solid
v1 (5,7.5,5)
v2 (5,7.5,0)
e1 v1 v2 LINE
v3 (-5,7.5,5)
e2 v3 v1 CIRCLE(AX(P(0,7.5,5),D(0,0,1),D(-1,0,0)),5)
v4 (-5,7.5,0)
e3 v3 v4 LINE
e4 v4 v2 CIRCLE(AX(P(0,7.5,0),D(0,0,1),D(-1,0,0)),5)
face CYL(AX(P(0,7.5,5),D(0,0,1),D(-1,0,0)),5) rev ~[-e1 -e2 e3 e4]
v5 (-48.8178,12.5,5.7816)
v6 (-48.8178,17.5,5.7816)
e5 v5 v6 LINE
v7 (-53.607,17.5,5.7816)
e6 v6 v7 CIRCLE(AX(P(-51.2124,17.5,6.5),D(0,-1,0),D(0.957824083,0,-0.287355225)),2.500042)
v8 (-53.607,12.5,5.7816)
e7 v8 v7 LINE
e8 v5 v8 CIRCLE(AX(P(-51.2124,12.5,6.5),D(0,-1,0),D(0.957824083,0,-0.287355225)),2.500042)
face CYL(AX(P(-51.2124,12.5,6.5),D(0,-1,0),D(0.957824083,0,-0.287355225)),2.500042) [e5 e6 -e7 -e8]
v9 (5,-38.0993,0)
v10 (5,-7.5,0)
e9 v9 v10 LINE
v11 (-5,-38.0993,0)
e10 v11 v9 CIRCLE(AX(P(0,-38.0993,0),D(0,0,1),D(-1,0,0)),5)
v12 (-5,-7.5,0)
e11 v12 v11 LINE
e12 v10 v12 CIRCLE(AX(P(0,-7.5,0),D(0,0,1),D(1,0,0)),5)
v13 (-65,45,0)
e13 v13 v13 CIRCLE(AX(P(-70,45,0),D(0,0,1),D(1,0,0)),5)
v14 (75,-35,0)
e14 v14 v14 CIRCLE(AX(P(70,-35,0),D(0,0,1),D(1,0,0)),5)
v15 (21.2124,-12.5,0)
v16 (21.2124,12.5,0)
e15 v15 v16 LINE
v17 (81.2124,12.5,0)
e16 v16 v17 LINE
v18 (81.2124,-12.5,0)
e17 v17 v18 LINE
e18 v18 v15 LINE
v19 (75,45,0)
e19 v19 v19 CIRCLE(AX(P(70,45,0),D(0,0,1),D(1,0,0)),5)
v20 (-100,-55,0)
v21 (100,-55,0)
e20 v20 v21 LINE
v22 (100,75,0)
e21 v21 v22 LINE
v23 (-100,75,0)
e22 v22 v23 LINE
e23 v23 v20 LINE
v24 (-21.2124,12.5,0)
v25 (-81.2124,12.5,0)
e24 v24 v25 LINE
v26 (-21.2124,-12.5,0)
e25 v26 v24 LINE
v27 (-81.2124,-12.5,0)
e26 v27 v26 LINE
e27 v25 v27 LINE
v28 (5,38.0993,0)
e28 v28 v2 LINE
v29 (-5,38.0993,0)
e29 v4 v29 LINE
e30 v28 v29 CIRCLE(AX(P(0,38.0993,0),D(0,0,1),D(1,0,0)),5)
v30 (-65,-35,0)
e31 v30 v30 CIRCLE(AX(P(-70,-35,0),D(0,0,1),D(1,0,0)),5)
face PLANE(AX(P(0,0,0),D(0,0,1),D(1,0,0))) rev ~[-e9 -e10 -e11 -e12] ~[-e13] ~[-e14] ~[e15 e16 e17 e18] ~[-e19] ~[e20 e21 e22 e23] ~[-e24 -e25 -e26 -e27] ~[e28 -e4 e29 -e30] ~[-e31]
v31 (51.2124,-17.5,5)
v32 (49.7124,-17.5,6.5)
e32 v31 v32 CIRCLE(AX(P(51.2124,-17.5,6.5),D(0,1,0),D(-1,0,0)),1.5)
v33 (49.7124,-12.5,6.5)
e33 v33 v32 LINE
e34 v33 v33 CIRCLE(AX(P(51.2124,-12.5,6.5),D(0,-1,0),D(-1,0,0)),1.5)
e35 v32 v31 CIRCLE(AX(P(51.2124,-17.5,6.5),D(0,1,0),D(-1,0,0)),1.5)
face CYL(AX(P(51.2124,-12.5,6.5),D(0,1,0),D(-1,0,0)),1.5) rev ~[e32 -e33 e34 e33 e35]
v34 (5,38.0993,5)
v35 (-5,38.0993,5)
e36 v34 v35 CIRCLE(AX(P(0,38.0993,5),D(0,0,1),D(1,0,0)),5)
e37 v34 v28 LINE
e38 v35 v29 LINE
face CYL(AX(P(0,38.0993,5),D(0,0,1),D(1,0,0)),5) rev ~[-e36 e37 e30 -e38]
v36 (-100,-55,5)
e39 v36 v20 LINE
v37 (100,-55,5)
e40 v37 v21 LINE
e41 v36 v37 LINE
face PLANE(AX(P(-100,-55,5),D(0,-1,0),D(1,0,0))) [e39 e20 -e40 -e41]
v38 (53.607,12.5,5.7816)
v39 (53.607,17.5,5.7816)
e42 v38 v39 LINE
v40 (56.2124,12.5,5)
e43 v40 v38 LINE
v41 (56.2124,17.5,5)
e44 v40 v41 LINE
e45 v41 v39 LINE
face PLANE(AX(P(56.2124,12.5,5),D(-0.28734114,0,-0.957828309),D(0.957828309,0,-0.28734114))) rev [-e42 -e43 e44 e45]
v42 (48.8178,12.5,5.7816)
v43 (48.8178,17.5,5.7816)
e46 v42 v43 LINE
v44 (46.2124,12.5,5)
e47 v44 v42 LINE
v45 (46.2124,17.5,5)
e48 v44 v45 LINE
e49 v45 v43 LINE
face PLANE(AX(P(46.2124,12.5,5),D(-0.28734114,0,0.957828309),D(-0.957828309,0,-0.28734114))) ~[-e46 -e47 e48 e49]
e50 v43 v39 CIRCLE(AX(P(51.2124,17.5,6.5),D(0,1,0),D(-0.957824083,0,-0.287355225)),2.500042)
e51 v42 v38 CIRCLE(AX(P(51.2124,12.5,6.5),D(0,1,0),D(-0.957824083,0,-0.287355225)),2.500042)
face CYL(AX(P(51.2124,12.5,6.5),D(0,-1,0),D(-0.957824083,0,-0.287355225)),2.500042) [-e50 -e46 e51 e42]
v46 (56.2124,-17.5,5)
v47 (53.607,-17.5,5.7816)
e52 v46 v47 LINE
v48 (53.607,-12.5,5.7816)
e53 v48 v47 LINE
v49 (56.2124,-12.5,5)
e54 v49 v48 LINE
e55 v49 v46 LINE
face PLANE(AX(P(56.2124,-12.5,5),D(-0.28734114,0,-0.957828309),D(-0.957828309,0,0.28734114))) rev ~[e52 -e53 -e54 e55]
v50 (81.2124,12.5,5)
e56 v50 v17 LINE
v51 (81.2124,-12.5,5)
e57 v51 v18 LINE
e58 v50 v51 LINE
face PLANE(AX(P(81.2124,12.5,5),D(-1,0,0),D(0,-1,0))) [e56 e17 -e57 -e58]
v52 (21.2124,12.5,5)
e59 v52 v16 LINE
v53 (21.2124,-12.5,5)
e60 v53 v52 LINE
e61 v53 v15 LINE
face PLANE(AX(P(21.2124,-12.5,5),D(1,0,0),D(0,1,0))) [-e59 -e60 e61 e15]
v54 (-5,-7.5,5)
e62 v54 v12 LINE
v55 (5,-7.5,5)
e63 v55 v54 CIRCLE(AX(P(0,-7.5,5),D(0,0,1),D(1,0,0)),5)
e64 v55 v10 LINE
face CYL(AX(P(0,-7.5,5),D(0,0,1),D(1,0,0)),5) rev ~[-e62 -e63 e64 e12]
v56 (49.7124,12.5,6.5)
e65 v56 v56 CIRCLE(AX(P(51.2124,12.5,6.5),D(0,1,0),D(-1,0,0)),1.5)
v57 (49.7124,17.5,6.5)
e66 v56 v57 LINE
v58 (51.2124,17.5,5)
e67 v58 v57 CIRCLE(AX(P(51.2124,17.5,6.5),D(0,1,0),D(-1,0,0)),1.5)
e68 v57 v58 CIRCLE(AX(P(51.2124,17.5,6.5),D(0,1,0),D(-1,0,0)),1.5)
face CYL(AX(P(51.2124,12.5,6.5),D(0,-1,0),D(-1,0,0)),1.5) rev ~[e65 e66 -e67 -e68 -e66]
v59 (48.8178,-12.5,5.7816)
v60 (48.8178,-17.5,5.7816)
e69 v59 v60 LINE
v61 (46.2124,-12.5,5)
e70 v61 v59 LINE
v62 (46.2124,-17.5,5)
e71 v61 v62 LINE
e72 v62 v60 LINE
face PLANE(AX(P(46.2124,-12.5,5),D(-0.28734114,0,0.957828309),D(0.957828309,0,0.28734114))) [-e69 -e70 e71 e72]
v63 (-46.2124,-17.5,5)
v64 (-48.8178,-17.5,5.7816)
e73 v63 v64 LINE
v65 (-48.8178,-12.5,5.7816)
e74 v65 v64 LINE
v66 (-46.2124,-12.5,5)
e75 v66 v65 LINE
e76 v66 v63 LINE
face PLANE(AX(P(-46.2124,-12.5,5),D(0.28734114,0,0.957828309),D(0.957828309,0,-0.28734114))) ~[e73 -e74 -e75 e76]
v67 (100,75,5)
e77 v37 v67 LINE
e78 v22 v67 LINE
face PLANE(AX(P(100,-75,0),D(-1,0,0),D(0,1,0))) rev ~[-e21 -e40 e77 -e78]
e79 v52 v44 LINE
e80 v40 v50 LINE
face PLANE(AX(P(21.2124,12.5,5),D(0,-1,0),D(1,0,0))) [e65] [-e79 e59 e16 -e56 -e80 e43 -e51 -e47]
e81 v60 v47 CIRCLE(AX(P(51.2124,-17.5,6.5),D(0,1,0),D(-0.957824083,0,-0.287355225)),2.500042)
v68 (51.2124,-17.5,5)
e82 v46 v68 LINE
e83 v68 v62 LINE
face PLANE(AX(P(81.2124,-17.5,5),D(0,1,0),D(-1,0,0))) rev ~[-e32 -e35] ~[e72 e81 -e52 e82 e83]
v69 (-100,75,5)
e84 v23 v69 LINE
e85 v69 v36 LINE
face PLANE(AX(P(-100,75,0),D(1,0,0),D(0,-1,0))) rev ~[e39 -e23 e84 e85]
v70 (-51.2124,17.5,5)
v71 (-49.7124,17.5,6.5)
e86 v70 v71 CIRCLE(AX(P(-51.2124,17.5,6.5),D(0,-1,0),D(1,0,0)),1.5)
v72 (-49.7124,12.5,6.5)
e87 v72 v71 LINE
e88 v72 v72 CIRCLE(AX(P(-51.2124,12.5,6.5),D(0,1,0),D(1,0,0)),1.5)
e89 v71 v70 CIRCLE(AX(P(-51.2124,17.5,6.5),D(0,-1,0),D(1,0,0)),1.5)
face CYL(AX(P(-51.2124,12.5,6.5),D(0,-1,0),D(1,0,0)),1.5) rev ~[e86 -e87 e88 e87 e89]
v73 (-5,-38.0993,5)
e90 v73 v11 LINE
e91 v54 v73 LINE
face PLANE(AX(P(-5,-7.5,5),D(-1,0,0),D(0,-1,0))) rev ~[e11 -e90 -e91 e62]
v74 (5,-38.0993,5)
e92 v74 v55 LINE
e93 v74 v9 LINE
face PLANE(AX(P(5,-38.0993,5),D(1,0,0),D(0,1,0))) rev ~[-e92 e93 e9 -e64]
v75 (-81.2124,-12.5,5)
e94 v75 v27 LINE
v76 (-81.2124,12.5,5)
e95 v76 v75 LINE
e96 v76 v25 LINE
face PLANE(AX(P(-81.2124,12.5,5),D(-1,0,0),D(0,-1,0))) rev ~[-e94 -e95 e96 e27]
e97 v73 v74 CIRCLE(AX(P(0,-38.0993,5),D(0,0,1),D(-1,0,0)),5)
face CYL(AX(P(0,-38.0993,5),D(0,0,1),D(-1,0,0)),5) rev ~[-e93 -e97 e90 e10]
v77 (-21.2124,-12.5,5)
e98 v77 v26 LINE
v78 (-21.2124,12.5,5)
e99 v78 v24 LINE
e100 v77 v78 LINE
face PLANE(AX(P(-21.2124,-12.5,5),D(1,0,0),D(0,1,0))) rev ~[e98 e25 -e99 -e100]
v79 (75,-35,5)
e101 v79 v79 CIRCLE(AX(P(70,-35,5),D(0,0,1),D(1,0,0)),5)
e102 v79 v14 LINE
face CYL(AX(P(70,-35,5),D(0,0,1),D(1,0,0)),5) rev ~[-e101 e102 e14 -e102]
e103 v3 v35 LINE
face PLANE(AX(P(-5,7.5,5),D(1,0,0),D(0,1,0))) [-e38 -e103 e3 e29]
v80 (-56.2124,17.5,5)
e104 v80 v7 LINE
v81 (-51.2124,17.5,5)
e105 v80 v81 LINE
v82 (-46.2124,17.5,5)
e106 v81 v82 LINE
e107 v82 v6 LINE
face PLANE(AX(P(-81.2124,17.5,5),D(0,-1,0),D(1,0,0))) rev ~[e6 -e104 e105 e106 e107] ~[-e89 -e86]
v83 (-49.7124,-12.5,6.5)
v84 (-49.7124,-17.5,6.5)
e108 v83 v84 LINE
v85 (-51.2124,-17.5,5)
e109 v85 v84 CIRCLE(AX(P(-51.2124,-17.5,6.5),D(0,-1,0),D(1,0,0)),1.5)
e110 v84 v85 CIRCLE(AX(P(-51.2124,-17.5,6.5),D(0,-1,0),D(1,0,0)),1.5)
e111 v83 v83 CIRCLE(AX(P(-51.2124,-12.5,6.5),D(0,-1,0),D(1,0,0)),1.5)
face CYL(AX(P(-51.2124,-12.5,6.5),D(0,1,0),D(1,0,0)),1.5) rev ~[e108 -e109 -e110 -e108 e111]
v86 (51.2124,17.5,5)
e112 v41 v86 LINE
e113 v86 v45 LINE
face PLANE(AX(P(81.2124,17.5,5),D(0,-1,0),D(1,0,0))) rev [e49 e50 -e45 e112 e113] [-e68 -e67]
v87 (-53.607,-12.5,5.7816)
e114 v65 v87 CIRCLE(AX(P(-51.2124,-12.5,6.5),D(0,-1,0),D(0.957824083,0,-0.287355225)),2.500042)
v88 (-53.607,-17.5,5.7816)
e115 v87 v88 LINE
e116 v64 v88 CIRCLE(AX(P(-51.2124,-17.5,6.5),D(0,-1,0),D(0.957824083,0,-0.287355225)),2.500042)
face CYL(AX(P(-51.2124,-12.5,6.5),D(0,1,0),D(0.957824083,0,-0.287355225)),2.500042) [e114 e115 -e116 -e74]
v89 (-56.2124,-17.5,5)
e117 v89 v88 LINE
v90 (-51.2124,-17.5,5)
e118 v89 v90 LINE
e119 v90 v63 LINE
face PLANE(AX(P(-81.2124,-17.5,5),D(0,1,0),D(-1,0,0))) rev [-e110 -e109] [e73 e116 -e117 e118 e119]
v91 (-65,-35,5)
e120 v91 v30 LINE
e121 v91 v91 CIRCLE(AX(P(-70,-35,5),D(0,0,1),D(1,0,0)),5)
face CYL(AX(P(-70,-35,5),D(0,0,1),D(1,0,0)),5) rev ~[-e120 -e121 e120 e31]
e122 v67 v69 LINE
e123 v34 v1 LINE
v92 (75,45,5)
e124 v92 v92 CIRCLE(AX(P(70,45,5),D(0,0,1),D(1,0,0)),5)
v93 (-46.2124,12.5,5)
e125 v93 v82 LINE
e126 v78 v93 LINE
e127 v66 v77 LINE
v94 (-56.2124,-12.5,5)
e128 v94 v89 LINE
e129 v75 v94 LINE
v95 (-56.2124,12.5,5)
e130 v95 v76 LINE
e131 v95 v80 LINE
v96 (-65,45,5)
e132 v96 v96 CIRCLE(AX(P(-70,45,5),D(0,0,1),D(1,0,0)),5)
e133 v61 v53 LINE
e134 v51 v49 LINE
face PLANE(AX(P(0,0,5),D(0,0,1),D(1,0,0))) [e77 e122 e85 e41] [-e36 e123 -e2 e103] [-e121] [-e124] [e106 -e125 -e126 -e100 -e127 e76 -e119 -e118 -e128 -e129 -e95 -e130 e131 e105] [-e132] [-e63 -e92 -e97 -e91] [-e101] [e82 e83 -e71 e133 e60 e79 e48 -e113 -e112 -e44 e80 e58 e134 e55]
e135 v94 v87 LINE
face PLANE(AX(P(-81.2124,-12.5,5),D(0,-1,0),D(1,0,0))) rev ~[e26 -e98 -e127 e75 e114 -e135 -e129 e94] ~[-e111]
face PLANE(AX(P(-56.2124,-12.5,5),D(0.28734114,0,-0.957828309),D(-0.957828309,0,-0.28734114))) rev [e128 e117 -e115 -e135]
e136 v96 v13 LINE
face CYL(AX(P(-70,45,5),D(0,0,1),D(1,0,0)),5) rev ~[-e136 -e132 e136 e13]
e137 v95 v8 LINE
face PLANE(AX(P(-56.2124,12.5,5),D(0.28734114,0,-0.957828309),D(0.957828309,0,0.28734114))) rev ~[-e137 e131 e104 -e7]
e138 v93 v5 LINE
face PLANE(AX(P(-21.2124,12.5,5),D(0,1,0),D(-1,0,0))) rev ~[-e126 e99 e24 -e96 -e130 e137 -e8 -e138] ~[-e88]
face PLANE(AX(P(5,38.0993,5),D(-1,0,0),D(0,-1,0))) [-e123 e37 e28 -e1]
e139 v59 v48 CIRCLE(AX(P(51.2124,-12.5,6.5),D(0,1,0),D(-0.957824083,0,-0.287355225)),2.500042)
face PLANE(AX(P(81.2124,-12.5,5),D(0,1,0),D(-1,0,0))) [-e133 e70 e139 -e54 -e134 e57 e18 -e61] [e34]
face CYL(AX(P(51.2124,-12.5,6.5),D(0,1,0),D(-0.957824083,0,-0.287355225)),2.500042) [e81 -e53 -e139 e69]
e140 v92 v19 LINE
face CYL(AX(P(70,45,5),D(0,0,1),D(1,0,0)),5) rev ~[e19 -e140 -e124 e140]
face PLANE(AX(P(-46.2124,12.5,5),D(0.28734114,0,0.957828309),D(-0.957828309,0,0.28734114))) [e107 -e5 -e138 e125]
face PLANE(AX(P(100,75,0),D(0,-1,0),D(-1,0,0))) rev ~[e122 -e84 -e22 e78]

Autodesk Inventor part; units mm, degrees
ref_plane "YZ Plane" through (0, 0, 0) normal (1, 0, 0) x (0, 1, 0)
ref_plane "XZ Plane" through (0, 0, 0) normal (0, 1, 0) x (-1, 0, 0)
sketch "Эскиз1" plane through (0, 0, 0) normal (0, 0, 1) x (1, 0, 0)
  line L0 (-100, -75) -> (100, -75)
  line L1 (100, -75) -> (100, 75)
  line L2 (100, 75) -> (-100, 75)
  line L3 (-100, 75) -> (-100, -75)
  line L4 (-100, -75) -> (100, 75) construction
  line L5 (100, -75) -> (-100, 75) construction
  point P0 (0, 0)
  dimension "d0" = 200
  dimension "d1" = 150
extrude "Выдавливание1" add sketch "Эскиз1" along normal blind 5
sketch "Эскиз2" plane through (0, 0, 5) normal (0, 0, 1) x (1, 0, 0)
  line L0 (-100, -75) -> (100, -75) projected
  line L1 (100, -75) -> (100, 75) projected
  line L2 (100, 75) -> (-100, 75) projected
  line L3 (-100, 75) -> (-100, -75) projected
  line L4 (100, 75) -> (-100, 75) construction
  line L5 (0, 75) -> (0, -75) construction
  line L6 (-100, 0) -> (100, 0) construction
  line L7 (100, -75) -> (100, 75) construction
  line L8 (-100, -12.5) -> (100, -12.5) construction
  line L9 (100, -12.5) -> (100, 12.5) construction
  line L10 (100, 12.5) -> (-100, 12.5) construction
  line L11 (-100, 12.5) -> (-100, -12.5) construction
  line L12 (-100, -12.5) -> (100, 12.5) construction
  line L13 (100, -12.5) -> (-100, 12.5) construction
  line L14 (-100, 0) -> (0, 0) construction
  line L15 (-51.2124, 75) -> (-51.2124, -75) construction
  line L16 (-100, -75) -> (100, -75) construction
  line L17 (0, 0) -> (100, 0) construction
  line L18 (50, 75) -> (50, -75) construction
  line L19 (-81.2124, -12.5) -> (-21.2124, -12.5)
  line L20 (-21.2124, -12.5) -> (-21.2124, 12.5)
  line L21 (-21.2124, 12.5) -> (-81.2124, 12.5)
  line L22 (-81.2124, 12.5) -> (-81.2124, -12.5)
  line L23 (-81.2124, -12.5) -> (-21.2124, 12.5) construction
  line L24 (-21.2124, -12.5) -> (-81.2124, 12.5) construction
  line L25 (81.2124, -12.5) -> (21.2124, -12.5)
  line L26 (21.2124, -12.5) -> (21.2124, 12.5)
  line L27 (21.2124, 12.5) -> (81.2124, 12.5)
  line L28 (81.2124, 12.5) -> (81.2124, -12.5)
  point P0 (-51.2124, 0)
  dimension "d4" = 25
  dimension "d5" = 60
extrude "Выдавливание2" cut sketch "Эскиз2" against normal blind 5 contours L22 L21 L20 L19 | L25 L26 L27 L28
sketch "Эскиз3" plane through (-81.2124, 12.5, 5) normal (0, -1, 0) x (1, 0, 0)
  line L0 (0, 0) -> (60, 0) projected
  line L1 (30, 0) -> (30, 14.9537) construction
  line L2 (30, 0) -> (40, 0) construction
  line L3 (30, 0) -> (35, 0) construction
  line L4 (30, 0) -> (25, 0) construction
  line L5 (25, 0) -> (35, 0) construction
  line L6 (25, 0) -> (35, 0)
  line L7 (30, 0) -> (30, 3) construction
  circle A0 centre (30, 1.5) radius 1.5
  arc A1 (32.3946, 0.7816) -> (27.6054, 0.7816) centre (30, 1.5) ccw
  line L8 (35, 0) -> (32.3946, 0.7816)
  line L9 (25, 0) -> (27.6054, 0.7816)
  point P0 (81.2124, -5)
  dimension "d8" = 10
  dimension "d9" = 5
  dimension "d10" = 5
  dimension "d11" = 3
  dimension "d12" = 1
extrude "Выдавливание3" add sketch "Эскиз3" against normal blind 5
mirror "Зеркальное отражение1" about plane through (0, 0, 0) normal (0, 1, 0) of "Выдавливание3"
sketch "Эскиз4" plane through (-81.2124, 12.5, 0) normal (0, -1, 0) x (1, 0, 0)
  circle A0 centre (30, 6.5) radius 1.5 projected
  point P0 (81.2124, 0)
surface extrude "ВыдавПврх1" sketch "Эскиз4" along normal up to next shown yes curves A0
boundary_patch "Участок поверхности1"
boundary_patch "Участок поверхности2"
ref_plane "РабПлоскость1" through (-81.2124, 0, 0) normal (0, -1, 0) x (1, 0, 0)
sketch "Эскиз6" plane through (0, 0, 5) normal (0, 0, 1) x (1, 0, 0)
  line L0 (81.2124, -12.5) -> (21.2124, -12.5) projected
  line L1 (21.2124, -12.5) -> (21.2124, 12.5) projected
  line L2 (21.2124, 12.5) -> (81.2124, 12.5) projected
  line L3 (81.2124, 12.5) -> (81.2124, -12.5) projected
  line L4 (-100, -75) -> (100, -75) projected
  line L5 (100, -75) -> (100, 75) projected
  line L6 (100, 75) -> (-100, 75) projected
  line L7 (-100, 75) -> (-100, -75) projected
  line L8 (-46.2124, -12.5) -> (-46.2124, -17.5) projected
  line L9 (-46.2124, -17.5) -> (-51.2124, -17.5) projected
  line L10 (-51.2124, -17.5) -> (-56.2124, -17.5) projected
  line L11 (-56.2124, -17.5) -> (-56.2124, -12.5) projected
  line L12 (-56.2124, -12.5) -> (-81.2124, -12.5) projected
  line L13 (-81.2124, -12.5) -> (-81.2124, 12.5) projected
  line L14 (-81.2124, 12.5) -> (-56.2124, 12.5) projected
  line L15 (-56.2124, 12.5) -> (-56.2124, 17.5) projected
  line L16 (-56.2124, 17.5) -> (-51.2124, 17.5) projected
  line L17 (-51.2124, 17.5) -> (-46.2124, 17.5) projected
  line L18 (-46.2124, 17.5) -> (-46.2124, 12.5) projected
  line L19 (-46.2124, 12.5) -> (-21.2124, 12.5) projected
  line L20 (-21.2124, 12.5) -> (-21.2124, -12.5) projected
  line L21 (-21.2124, -12.5) -> (-46.2124, -12.5) projected
  line L22 (-100, -75) -> (100, -75) construction
  line L23 (-21.2124, -75) -> (-21.2124, 75) construction
  line L24 (100, 75) -> (-100, 75) construction
  line L25 (-21.2124, 12.5) -> (-21.2124, 75) construction
  line L26 (-21.2124, 75) -> (21.2124, 75) construction
  line L27 (21.2124, 75) -> (21.2124, 12.5) construction
  line L28 (21.2124, 12.5) -> (-21.2124, 12.5) construction
  line L29 (-21.2124, 12.5) -> (-21.2124, 75) construction
  line L30 (-21.2124, -75) -> (21.2124, -75) construction
  line L31 (21.2124, -75) -> (21.2124, -12.5) construction
  line L32 (21.2124, -12.5) -> (-21.2124, -12.5) construction
  line L33 (-21.2124, -12.5) -> (-21.2124, -75) construction
  line L34 (100, -75) -> (100, 75) construction
  line L35 (-100, -7.5) -> (100, -7.5) construction
  line L36 (100, -7.5) -> (100, 7.5) construction
  line L37 (100, 7.5) -> (-100, 7.5) construction
  line L38 (-100, 7.5) -> (-100, -7.5) construction
  line L39 (-100, -7.5) -> (100, 7.5) construction
  line L40 (100, -7.5) -> (-100, 7.5) construction
  line L41 (0, 7.5) -> (0, 17.5) construction
  line L42 (0, -7.5) -> (0, -28.0993) construction
  line L43 (-21.2124, 0) -> (21.2124, 0) construction
  arc A0 (-5, -38.0993) -> (5, -38.0993) centre (0, -38.0993) ccw
  arc A1 (5, -7.5) -> (-5, -7.5) centre (0, -7.5) ccw
  line L44 (-5, -7.5) -> (-5, -38.0993)
  line L45 (5, -38.0993) -> (5, -7.5)
  line L46 (100, 0) -> (-100, 0) construction
  line L47 (-100, 75) -> (-100, -75) construction
  arc A2 (5, 38.0993) -> (-5, 38.0993) centre (0, 38.0993) ccw
  arc A3 (-5, 7.5) -> (5, 7.5) centre (0, 7.5) ccw
  line L48 (-5, 7.5) -> (-5, 38.0993)
  line L49 (5, 38.0993) -> (5, 7.5)
  point P0 (0, 0)
  point P1 (0, -17.7997)
  dimension "d24" = 15
  dimension "d25" = 10
  dimension "d38" = 10
  dimension "d39" = 10
extrude "Выдавливание5" cut sketch "Эскиз6" against normal blind 20 contours L44 A1 L45 A0 | L49 A3 L48 A2
mirror "Зеркальное отражение2" about plane through (0, 0, 0) normal (1, 0, 0) of "Выдавливание3", "ВыдавПврх1", "Зеркальное отражение1"
sketch "Эскиз7" plane through (0, 0, 5) normal (0, 0, 1) x (1, 0, 0)
  line L0 (-100, -75) -> (100, -75) projected
  line L1 (100, -75) -> (100, 75) projected
  line L2 (100, 75) -> (-100, 75) projected
  line L3 (-100, 75) -> (-100, -75) projected
  line L4 (-46.2124, -12.5) -> (-46.2124, -17.5) projected
  line L5 (-46.2124, -17.5) -> (-51.2124, -17.5) projected
  line L6 (-51.2124, -17.5) -> (-56.2124, -17.5) projected
  line L7 (-56.2124, -17.5) -> (-56.2124, -12.5) projected
  line L8 (-56.2124, -12.5) -> (-81.2124, -12.5) projected
  line L9 (-81.2124, -12.5) -> (-81.2124, 12.5) projected
  line L10 (-81.2124, 12.5) -> (-56.2124, 12.5) projected
  line L11 (-56.2124, 12.5) -> (-56.2124, 17.5) projected
  line L12 (-56.2124, 17.5) -> (-51.2124, 17.5) projected
  line L13 (-51.2124, 17.5) -> (-46.2124, 17.5) projected
  line L14 (-46.2124, 17.5) -> (-46.2124, 12.5) projected
  line L15 (-46.2124, 12.5) -> (-21.2124, 12.5) projected
  line L16 (-21.2124, 12.5) -> (-21.2124, -12.5) projected
  line L17 (-21.2124, -12.5) -> (-46.2124, -12.5) projected
  line L18 (56.2124, -12.5) -> (56.2124, -17.5) projected
  line L19 (56.2124, -17.5) -> (51.2124, -17.5) projected
  line L20 (51.2124, -17.5) -> (46.2124, -17.5) projected
  line L21 (46.2124, -17.5) -> (46.2124, -12.5) projected
  line L22 (46.2124, -12.5) -> (21.2124, -12.5) projected
  line L23 (21.2124, -12.5) -> (21.2124, 12.5) projected
  line L24 (21.2124, 12.5) -> (46.2124, 12.5) projected
  line L25 (46.2124, 12.5) -> (46.2124, 17.5) projected
  line L26 (46.2124, 17.5) -> (51.2124, 17.5) projected
  line L27 (51.2124, 17.5) -> (56.2124, 17.5) projected
  line L28 (56.2124, 17.5) -> (56.2124, 12.5) projected
  line L29 (56.2124, 12.5) -> (81.2124, 12.5) projected
  line L30 (81.2124, 12.5) -> (81.2124, -12.5) projected
  line L31 (81.2124, -12.5) -> (56.2124, -12.5) projected
  line L32 (-100, 75) -> (-70, 75) construction
  line L33 (-70, 75) -> (-70, 45) construction
  line L34 (-70, 45) -> (-100, 45) construction
  line L35 (-100, 45) -> (-100, 75) construction
  circle A0 centre (-70, 45) radius 5
  line L36 (100, -75) -> (100, 75) construction
  line L37 (100, 0) -> (-100, 0) construction
  line L38 (100, 75) -> (-100, 75) construction
  line L39 (0, 75) -> (0, -75) construction
  line L40 (-100, -75) -> (100, -75) construction
  circle A1 centre (70, 45) radius 5
  line L41 (-100, -75) -> (100, -75) projected
  line L42 (-70, -75) -> (-70, -35) construction
  line L43 (-70, -35) -> (-100, -35) construction
  circle A2 centre (-70, -35) radius 5
  line L44 (70, -75) -> (70, -35) construction
  line L45 (70, -35) -> (100, -35) construction
  circle A3 centre (70, -35) radius 5
  line L46 (-100, -75) -> (-100, -55)
  line L47 (-100, -55) -> (100, -55)
  line L48 (100, -75) -> (100, -55)
  point P0 (0, 0)
  dimension "d30" = 30
  dimension "d31" = 30
  dimension "d32" = 10
  dimension "d35" = 40
  dimension "d36" = 10
  dimension "d37" = 20
extrude "Выдавливание6" cut sketch "Эскиз7" against normal blind 20 contours L3 L47 L1 L0 | A0 | A1 | A2 | A3
properties part number "Down"
